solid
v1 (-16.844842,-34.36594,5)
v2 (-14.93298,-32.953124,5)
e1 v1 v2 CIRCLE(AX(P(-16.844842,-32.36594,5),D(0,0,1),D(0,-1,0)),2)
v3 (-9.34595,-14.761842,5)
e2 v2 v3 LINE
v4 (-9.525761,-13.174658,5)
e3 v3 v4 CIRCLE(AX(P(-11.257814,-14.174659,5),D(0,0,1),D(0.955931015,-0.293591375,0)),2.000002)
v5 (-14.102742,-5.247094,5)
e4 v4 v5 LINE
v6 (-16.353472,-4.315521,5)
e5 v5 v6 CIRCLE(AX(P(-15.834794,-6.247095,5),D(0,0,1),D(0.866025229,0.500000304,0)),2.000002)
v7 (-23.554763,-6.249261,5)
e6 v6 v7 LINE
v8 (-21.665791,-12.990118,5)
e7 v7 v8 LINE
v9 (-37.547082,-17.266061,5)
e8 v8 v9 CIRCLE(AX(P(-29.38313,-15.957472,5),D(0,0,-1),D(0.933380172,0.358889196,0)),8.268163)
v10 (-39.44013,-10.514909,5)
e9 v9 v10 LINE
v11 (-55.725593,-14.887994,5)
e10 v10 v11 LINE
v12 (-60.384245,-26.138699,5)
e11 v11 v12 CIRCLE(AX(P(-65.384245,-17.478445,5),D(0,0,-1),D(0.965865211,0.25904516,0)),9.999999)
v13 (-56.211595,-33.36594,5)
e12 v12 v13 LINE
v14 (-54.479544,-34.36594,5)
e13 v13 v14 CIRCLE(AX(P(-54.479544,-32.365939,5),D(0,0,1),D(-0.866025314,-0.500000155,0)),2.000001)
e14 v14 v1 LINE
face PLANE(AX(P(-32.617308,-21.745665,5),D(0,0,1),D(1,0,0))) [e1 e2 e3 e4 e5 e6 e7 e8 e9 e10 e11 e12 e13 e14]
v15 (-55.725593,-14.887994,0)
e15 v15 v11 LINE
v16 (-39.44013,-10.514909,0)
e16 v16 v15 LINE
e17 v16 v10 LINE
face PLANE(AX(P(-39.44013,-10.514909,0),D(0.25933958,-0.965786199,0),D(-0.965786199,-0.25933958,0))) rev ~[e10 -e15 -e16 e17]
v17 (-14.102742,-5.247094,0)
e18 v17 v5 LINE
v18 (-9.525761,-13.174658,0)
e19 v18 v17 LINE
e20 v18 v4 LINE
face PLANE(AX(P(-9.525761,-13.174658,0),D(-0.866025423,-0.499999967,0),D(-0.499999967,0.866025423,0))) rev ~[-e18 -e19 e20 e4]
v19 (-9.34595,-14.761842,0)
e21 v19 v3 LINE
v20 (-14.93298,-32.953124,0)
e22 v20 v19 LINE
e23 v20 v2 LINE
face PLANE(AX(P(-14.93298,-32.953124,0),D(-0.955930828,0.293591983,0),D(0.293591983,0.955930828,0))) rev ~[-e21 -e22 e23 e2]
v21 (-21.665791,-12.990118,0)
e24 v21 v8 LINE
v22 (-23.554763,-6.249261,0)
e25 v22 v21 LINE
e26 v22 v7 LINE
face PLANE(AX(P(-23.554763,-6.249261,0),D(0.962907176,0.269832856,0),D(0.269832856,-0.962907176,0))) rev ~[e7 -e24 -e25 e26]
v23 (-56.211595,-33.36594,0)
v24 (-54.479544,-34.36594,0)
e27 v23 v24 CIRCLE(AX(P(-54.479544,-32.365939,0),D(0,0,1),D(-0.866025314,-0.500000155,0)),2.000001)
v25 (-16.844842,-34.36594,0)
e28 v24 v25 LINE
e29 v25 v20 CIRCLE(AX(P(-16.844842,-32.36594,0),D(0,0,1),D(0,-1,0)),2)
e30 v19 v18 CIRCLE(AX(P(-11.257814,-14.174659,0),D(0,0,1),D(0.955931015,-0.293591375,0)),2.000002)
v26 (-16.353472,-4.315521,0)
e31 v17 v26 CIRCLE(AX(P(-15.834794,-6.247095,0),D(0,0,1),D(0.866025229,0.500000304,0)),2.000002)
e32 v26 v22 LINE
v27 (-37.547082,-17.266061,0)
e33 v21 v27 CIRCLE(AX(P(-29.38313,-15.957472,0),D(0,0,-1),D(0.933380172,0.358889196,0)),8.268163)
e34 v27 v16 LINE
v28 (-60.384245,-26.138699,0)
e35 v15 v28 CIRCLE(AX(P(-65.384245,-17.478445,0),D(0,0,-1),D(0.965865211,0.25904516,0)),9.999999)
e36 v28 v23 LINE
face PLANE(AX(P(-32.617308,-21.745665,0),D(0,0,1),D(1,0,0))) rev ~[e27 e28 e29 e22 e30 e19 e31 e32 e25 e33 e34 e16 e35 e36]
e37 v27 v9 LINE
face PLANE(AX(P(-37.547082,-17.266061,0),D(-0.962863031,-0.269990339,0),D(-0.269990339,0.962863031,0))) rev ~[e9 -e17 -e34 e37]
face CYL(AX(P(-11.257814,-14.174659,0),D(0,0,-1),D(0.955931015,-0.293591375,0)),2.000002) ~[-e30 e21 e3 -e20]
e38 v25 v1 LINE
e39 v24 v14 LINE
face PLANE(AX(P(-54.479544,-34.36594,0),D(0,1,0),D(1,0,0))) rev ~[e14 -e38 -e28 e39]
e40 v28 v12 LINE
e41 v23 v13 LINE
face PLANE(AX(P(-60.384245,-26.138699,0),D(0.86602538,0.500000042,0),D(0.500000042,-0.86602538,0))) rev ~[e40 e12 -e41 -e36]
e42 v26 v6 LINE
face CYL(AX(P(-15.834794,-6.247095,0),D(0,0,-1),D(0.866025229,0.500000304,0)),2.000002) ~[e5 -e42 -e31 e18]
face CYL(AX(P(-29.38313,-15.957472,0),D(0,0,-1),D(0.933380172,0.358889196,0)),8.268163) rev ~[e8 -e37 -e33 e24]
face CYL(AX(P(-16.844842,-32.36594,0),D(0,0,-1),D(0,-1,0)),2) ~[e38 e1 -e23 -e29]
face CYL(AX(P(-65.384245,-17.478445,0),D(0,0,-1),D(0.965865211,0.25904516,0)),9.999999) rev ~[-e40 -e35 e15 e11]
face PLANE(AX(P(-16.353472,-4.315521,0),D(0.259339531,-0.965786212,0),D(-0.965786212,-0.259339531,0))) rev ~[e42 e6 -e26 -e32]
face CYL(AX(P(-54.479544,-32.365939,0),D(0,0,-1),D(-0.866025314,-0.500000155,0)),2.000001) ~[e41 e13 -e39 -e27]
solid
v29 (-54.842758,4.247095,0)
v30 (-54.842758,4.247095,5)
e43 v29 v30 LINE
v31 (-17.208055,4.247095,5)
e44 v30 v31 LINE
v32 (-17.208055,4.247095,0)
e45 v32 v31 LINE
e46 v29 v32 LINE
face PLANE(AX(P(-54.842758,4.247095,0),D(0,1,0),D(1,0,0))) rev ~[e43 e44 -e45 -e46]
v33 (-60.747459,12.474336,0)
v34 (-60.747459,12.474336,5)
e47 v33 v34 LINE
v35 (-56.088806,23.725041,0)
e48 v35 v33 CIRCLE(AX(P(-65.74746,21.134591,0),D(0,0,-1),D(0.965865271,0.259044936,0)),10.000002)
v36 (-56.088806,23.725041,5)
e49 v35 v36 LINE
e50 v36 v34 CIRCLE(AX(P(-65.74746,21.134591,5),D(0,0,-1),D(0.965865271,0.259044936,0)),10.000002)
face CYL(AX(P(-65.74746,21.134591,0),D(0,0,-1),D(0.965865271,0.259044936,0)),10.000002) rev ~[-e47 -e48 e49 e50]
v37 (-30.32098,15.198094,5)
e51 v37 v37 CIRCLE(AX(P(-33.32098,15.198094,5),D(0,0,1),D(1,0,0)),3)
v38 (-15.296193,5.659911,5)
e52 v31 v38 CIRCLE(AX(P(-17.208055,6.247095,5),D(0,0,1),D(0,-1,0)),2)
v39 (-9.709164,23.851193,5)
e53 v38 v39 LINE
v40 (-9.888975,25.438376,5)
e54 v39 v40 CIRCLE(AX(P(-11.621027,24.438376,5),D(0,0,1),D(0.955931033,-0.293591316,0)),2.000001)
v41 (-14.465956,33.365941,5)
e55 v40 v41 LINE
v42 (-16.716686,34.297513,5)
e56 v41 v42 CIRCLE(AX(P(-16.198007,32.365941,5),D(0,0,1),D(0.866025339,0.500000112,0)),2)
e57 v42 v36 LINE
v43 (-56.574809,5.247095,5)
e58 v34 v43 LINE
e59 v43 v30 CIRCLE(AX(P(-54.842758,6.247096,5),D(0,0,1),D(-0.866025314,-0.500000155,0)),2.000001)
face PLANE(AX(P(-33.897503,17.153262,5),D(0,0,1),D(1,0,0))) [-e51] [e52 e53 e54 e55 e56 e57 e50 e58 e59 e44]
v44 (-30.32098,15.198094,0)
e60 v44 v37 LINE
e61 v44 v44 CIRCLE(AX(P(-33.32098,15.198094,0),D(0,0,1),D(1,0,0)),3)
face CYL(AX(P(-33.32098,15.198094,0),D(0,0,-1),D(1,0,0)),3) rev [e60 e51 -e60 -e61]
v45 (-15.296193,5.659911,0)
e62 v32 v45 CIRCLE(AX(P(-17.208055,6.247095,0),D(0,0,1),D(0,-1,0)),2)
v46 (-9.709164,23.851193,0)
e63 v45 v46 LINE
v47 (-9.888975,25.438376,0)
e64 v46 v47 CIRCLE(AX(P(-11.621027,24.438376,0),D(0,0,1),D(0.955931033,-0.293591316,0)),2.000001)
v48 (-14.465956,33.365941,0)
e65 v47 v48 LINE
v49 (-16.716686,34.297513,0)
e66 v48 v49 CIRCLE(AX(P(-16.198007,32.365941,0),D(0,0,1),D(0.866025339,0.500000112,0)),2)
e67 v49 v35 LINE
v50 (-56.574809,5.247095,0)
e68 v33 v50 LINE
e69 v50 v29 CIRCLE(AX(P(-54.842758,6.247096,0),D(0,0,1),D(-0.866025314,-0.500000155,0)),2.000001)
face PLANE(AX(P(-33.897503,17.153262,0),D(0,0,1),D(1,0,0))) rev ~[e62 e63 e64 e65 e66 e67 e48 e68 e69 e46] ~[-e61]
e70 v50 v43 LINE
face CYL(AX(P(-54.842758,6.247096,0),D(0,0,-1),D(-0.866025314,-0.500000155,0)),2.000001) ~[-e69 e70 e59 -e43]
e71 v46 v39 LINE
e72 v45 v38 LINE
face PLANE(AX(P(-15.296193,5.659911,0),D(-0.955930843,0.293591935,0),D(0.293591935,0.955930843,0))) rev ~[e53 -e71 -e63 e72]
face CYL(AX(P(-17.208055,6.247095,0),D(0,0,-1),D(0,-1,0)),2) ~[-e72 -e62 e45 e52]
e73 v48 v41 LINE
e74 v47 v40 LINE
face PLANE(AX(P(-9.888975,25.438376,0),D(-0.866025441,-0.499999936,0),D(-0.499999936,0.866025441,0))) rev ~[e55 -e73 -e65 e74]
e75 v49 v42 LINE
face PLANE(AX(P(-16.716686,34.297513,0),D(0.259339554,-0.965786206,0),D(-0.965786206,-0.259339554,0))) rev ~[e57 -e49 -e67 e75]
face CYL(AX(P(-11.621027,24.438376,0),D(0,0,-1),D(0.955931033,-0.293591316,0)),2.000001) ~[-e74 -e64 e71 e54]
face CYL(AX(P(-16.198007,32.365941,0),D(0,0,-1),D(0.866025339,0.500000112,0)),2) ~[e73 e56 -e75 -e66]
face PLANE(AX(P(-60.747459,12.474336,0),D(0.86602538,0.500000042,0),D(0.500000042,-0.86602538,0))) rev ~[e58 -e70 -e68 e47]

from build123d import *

# Parameters (mm, degrees)
F0_R     = 3
F1_DEPTH = 5
F2_DEPTH = 5


# Not quite as in the source:
# - ends of sketch curves that miss each other by under 0.0002 mm in the source are joined


with BuildPart() as f1:
    # F0 (on Top) → F1 (new body)
    with BuildSketch(Plane.XY):
        with BuildLine():
            Line((-9.888975, 25.438376), (-14.465956, 33.365941))
            ThreePointArc((-14.465956, 33.365941), (-15.4331378873, 34.2139061621), (-16.71668586, 34.2975134786))
            Line((-16.71668586, 34.2975134786), (-56.088806, 23.725041))
            ThreePointArc((-56.088806, 23.725041), (-56.5082159612, 17.3088367317), (-60.7474589836, 12.4743359716))
            Line((-60.7474589836, 12.4743359716), (-56.574809, 5.247095))
            ThreePointArc((-56.574809, 5.247095), (-55.8427580417, 4.5150442165), (-54.842758, 4.247095))
            Line((-54.842758, 4.247095), (-17.208055, 4.247095))
            ThreePointArc((-17.208055, 4.247095), (-16.019435709, 4.6386223763), (-15.2961934105, 5.6599108189))
            Line((-15.2961934105, 5.6599108189), (-9.709164, 23.851193))
            ThreePointArc((-9.709164, 23.851193), (-9.633738266, 24.6635147626), (-9.888975, 25.438376))
        make_face()
        with Locations((-33.32098, 15.198094)):
            Circle(F0_R, mode=Mode.SUBTRACT)
    extrude(amount=F1_DEPTH)


with BuildPart() as f2:
    # F0 (on Top) → F2 (new body)
    with BuildSketch(Plane.XY):
        with BuildLine():
            Line((-16.353472, -4.315521), (-23.554763, -6.249261))
            Line((-23.554763, -6.249261), (-21.665791, -12.990118))
            ThreePointArc((-21.665791, -12.990118), (-27.2335281118, -23.941313877), (-37.5470821174, -17.2660610188))
            Line((-37.5470821174, -17.2660610188), (-39.44013, -10.514909))
            Line((-39.44013, -10.514909), (-55.725593, -14.887994))
            ThreePointArc((-55.725593, -14.887994), (-56.1450019117, -21.3041981487), (-60.3842449836, -26.1386990284))
            Line((-60.3842449836, -26.1386990284), (-56.211595, -33.36594))
            ThreePointArc((-56.211595, -33.36594), (-55.4795440417, -34.0979907835), (-54.479544, -34.36594))
            Line((-54.479544, -34.36594), (-16.844842, -34.36594))
            ThreePointArc((-16.844842, -34.36594), (-15.6562225909, -33.9744125364), (-14.9329803243, -32.9531239004))
            Line((-14.9329803243, -32.9531239004), (-9.34595, -14.761842))
            ThreePointArc((-9.34595, -14.761842), (-9.2705242122, -13.9495197123), (-9.5257611443, -13.1746580833))
            Line((-9.5257611443, -13.1746580833), (-14.102742, -5.247094))
            ThreePointArc((-14.102742, -5.247094), (-15.0699238873, -4.3991288379), (-16.353472, -4.315521))
        make_face()
    extrude(amount=F2_DEPTH)


solid = Compound([f1.part, f2.part])
